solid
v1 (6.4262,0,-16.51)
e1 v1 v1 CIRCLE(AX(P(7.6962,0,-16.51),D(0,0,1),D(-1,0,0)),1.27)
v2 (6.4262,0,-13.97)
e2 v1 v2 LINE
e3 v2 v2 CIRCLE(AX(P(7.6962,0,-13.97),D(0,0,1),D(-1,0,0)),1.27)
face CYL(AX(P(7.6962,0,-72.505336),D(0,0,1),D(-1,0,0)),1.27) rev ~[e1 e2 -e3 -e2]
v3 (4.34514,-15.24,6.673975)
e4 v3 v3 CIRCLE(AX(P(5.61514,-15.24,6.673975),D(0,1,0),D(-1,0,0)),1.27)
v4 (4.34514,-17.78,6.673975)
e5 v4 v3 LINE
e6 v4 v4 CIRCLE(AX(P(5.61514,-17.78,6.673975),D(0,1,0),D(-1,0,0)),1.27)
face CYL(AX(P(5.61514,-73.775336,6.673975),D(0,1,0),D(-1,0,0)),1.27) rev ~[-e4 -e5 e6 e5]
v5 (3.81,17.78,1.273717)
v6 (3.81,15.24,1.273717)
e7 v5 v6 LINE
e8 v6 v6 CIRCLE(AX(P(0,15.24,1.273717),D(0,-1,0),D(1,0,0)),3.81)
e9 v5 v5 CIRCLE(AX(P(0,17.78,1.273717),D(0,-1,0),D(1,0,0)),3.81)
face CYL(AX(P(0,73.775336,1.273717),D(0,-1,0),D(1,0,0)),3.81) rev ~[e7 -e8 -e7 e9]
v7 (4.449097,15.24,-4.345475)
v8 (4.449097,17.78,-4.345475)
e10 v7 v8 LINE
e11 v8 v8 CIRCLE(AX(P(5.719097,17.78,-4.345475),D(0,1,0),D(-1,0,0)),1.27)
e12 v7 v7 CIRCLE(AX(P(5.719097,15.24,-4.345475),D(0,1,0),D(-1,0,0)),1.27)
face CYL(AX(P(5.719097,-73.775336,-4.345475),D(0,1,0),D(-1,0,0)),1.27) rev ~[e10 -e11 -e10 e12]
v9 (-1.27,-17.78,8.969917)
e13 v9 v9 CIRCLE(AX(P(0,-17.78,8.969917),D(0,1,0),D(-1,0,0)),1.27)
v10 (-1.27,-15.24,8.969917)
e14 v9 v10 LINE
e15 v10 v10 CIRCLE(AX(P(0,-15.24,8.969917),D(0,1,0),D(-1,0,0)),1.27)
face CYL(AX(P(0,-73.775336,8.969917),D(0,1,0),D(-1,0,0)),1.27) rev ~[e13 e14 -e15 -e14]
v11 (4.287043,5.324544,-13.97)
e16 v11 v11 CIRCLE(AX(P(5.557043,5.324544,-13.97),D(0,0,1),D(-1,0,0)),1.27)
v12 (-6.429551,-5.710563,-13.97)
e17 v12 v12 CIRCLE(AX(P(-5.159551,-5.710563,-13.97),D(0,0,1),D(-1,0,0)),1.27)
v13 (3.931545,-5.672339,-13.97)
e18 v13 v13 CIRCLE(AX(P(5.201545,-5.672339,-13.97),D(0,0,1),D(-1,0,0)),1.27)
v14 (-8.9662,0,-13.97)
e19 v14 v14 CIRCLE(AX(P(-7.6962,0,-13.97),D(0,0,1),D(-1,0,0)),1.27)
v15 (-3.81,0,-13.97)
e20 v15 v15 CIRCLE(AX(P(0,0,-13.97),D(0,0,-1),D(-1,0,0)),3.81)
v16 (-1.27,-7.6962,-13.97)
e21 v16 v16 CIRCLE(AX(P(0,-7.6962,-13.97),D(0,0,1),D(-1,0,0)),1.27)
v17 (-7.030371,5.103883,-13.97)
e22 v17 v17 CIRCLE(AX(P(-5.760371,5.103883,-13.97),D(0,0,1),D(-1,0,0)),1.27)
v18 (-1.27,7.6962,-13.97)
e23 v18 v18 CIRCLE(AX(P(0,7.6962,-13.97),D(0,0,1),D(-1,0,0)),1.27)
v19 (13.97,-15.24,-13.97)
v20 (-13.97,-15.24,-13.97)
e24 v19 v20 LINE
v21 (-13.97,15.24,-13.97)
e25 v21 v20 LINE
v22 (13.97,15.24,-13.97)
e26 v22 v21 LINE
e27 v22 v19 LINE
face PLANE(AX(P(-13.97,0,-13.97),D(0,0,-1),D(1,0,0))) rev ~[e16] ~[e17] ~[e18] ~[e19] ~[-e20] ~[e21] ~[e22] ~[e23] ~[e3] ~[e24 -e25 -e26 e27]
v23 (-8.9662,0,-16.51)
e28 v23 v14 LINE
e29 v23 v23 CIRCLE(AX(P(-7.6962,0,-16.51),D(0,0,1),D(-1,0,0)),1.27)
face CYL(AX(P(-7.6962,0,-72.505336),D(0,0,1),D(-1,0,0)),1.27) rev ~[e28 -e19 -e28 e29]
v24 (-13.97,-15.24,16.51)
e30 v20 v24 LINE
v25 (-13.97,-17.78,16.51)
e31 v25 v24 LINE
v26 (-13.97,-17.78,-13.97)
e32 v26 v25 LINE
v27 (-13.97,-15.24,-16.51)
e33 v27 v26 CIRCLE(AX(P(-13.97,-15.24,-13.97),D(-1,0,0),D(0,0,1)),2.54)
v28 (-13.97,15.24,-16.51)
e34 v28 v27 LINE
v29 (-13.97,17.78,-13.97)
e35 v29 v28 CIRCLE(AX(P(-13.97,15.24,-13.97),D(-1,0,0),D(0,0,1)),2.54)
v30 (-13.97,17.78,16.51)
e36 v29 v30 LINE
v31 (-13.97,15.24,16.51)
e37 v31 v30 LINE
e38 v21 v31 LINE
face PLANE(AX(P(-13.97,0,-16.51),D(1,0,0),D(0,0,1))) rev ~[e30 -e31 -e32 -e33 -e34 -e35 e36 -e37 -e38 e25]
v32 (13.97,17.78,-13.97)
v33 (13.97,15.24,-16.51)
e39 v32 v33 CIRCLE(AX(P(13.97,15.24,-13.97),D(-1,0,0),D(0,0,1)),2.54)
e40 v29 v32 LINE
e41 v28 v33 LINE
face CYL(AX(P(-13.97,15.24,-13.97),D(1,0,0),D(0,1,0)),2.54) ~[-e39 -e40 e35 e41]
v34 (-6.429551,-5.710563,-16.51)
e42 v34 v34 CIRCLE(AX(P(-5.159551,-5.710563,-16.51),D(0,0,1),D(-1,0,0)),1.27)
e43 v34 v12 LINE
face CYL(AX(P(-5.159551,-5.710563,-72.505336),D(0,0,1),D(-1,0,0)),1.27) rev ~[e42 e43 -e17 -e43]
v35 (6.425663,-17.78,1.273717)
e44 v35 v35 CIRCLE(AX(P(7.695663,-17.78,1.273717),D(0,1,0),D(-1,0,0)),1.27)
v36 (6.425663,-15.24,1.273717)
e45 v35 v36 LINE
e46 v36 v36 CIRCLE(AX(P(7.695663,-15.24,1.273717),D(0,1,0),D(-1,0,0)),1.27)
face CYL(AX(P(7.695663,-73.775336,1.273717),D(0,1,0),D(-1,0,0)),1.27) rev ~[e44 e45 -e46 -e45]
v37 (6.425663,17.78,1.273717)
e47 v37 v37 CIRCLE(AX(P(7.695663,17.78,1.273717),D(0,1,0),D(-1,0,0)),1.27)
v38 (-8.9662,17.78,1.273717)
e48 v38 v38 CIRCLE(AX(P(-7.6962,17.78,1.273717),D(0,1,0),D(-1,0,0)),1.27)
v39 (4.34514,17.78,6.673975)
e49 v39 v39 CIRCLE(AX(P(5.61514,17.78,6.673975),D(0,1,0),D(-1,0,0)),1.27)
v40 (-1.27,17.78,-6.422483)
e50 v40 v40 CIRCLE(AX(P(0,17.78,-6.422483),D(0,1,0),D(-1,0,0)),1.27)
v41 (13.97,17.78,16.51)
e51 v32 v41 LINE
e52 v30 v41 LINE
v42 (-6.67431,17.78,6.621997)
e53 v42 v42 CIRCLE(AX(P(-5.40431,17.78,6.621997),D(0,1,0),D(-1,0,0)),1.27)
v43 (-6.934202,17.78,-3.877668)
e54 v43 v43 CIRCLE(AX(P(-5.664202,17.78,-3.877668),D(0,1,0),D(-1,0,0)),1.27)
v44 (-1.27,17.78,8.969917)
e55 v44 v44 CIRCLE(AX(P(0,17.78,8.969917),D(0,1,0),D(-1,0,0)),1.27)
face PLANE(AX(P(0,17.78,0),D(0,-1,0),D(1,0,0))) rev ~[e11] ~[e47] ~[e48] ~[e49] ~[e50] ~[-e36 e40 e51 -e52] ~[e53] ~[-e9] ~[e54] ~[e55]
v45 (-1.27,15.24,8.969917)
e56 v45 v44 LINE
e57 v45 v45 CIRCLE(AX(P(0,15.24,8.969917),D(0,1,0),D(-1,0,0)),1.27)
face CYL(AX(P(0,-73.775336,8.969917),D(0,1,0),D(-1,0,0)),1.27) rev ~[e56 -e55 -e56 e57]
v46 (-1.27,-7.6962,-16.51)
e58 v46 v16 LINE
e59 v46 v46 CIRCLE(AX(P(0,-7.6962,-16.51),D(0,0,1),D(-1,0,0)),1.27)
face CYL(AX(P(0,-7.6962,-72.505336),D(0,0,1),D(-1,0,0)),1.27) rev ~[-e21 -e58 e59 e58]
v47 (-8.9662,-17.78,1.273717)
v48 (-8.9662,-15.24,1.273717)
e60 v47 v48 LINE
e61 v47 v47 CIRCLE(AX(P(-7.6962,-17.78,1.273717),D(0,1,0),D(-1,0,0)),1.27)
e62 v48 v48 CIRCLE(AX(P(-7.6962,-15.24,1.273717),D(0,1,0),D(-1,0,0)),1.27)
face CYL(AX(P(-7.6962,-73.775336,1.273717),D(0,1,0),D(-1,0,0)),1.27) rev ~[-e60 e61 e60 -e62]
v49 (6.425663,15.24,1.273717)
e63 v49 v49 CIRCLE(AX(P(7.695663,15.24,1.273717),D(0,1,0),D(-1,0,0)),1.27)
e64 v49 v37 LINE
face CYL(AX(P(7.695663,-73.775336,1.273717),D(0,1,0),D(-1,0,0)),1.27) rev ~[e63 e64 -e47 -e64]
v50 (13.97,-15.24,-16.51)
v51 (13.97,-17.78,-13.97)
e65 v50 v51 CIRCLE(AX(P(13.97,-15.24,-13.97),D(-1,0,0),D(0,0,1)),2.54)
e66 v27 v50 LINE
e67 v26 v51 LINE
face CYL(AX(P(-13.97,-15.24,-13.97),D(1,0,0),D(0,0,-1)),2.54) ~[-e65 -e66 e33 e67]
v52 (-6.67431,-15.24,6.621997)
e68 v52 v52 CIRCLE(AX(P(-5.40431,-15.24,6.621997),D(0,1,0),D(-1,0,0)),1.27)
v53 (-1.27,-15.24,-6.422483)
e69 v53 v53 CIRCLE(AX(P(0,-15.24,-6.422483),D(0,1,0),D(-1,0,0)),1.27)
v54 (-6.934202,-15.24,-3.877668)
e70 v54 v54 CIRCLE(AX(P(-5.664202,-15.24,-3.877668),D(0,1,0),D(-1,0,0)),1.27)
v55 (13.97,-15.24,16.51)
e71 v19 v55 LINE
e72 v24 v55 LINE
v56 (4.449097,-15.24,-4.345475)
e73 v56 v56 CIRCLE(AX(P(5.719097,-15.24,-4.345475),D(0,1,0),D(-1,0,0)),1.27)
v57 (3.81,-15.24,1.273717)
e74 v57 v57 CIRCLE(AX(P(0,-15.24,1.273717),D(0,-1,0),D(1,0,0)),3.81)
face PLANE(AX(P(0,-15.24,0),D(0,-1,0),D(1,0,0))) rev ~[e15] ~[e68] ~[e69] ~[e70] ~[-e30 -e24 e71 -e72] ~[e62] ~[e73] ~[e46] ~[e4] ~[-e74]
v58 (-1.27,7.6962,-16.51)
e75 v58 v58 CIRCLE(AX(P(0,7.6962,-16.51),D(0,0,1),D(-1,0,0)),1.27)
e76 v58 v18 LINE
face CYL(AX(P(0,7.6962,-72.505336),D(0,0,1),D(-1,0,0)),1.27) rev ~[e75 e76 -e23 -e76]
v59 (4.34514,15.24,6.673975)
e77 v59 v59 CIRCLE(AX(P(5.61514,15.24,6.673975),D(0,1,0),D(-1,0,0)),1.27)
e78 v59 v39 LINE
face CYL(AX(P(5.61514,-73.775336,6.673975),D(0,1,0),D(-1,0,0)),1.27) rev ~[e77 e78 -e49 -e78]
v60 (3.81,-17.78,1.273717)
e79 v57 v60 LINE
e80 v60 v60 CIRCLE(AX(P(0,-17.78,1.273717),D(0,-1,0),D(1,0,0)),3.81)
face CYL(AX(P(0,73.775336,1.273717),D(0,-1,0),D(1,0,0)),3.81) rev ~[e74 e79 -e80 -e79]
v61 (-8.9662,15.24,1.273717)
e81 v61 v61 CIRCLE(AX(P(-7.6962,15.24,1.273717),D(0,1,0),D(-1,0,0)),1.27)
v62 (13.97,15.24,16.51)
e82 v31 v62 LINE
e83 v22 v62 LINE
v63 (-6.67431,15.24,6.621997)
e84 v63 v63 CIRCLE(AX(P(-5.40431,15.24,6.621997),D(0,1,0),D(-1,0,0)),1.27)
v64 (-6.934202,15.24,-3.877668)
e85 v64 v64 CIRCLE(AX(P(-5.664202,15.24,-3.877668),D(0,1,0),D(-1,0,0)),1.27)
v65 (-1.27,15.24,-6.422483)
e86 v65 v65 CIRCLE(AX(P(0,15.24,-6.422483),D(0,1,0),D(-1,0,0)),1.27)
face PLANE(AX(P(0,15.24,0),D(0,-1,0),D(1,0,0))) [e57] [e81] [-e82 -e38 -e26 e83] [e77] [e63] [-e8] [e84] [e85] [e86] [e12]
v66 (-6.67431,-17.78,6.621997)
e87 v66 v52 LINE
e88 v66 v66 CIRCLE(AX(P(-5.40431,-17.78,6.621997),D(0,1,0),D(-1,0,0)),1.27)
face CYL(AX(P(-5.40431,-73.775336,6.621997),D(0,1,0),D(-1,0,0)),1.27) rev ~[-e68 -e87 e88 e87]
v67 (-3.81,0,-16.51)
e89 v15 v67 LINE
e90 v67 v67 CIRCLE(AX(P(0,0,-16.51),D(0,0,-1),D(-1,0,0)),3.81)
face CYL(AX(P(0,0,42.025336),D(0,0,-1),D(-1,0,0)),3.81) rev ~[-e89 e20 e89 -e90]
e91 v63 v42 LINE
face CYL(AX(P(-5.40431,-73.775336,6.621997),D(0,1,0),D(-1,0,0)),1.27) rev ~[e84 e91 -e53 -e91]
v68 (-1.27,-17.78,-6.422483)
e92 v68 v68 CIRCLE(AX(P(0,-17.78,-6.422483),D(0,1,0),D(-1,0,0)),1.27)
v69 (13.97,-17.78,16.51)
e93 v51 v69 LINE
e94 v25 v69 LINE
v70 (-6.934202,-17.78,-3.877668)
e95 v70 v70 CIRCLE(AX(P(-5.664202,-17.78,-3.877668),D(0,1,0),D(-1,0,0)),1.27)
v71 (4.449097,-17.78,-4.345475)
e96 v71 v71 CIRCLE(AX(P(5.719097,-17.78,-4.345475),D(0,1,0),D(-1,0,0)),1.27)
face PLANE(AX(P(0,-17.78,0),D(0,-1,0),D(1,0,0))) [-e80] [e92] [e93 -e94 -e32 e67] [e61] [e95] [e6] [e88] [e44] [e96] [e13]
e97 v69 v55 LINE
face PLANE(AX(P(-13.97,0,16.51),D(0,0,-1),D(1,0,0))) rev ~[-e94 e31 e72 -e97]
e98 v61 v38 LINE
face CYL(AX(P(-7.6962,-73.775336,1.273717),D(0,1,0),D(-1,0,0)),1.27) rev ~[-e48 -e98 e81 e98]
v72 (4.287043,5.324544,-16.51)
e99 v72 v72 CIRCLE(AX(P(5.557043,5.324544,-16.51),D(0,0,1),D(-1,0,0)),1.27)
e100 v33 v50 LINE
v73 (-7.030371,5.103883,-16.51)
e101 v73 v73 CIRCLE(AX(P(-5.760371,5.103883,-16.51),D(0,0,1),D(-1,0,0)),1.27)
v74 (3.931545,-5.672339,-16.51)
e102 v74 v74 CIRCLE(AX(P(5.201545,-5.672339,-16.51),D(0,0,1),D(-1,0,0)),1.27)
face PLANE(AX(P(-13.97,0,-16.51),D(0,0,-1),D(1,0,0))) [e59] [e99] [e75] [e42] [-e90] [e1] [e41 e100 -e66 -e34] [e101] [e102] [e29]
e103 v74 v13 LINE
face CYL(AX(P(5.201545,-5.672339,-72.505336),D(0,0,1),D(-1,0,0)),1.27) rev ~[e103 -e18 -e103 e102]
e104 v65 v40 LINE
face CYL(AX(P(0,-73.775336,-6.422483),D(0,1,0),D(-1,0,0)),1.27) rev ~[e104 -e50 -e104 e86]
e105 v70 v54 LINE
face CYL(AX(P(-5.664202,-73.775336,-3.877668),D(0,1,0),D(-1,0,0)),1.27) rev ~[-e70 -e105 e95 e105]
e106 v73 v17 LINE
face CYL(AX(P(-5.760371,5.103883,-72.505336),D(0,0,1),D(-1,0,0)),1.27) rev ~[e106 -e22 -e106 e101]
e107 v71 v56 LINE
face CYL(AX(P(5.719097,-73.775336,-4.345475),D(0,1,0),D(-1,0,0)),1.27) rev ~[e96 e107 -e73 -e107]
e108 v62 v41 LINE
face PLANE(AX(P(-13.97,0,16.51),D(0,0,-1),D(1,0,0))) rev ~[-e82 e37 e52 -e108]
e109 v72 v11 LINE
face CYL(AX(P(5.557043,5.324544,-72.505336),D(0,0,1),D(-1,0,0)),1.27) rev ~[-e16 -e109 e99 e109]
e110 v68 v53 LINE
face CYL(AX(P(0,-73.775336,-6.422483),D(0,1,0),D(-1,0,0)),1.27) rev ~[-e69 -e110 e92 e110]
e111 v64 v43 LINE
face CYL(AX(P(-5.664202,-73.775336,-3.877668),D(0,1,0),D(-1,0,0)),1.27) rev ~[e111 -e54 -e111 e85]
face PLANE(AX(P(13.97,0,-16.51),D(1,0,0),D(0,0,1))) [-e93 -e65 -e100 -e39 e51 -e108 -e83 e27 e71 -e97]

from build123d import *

# Parameters (mm, degrees)
F0_W     = 27.94
F0_H     = 33.02
F1_DEPTH = 17.78
F2_T     = -2.54
F3_R     = 2.54
F5_D     = 7.62
F7_D     = 7.62
F9_D     = 2.54
F11_D    = 2.54


# Not quite as in the source:
# - a feature names something its author has since deleted; it is built from what else it names


with BuildPart() as f1:
    # F0 (on Front) → F1 (new body, symmetric)
    with BuildSketch(Plane.XZ):
        Rectangle(F0_W, F0_H)
    extrude(amount=F1_DEPTH, both=True)

    # F2
    f2_openings = [f1.faces().sort_by_distance(p)[0] for p in [
        (0, 0, 16.51),
        (-13.97, 0, 0),
        (13.97, 0, 0),
    ]]
    offset(amount=F2_T, openings=f2_openings)

    # F3
    f3_edges = [f1.edges().sort_by_distance(p)[0] for p in [
        (0, 17.78, -16.51),
        (0, -17.78, -16.51),
    ]]
    fillet(f3_edges, radius=F3_R)

    # F5 (through all)
    with Locations(Plane.XY.offset(-13.97)):
        with Locations((0, 0)):
            Hole(F5_D / 2)

    # F7 (through all)
    with Locations(Plane(origin=(0, 17.78, 0), x_dir=(-1, 0, 0), z_dir=(0, 1, 0))):
        with Locations((0, 1.2737165671)):
            Hole(F7_D / 2)

    # F9 (through all)
    with Locations(Plane.XZ.offset(17.78)):
        with Locations((-5.4043098353, 6.6219973378), (0, 8.9699165671), (5.6151403114, 6.673975382), (7.6956628408, 1.2737165671), (5.7190973312, -4.3454747647), (0, -6.4224834329), (-5.6642023847, -3.8776681758), (-7.6962, 1.2737165671)):
            Hole(F9_D / 2)

    # F11 (through all)
    with Locations(Plane(origin=(0, 0, -16.51), x_dir=(1, 0, 0), z_dir=(0, 0, -1))):
        with Locations((-5.1595509827, 5.7105628529), (0, 7.6962), (5.2015446278, 5.6723388408), (7.6962, 0), (-5.7603712318, -5.1038826115), (-7.6962, 0), (0, -7.6962), (5.5570431587, -5.3245437149)):
            Hole(F11_D / 2)


solid = f1.part
